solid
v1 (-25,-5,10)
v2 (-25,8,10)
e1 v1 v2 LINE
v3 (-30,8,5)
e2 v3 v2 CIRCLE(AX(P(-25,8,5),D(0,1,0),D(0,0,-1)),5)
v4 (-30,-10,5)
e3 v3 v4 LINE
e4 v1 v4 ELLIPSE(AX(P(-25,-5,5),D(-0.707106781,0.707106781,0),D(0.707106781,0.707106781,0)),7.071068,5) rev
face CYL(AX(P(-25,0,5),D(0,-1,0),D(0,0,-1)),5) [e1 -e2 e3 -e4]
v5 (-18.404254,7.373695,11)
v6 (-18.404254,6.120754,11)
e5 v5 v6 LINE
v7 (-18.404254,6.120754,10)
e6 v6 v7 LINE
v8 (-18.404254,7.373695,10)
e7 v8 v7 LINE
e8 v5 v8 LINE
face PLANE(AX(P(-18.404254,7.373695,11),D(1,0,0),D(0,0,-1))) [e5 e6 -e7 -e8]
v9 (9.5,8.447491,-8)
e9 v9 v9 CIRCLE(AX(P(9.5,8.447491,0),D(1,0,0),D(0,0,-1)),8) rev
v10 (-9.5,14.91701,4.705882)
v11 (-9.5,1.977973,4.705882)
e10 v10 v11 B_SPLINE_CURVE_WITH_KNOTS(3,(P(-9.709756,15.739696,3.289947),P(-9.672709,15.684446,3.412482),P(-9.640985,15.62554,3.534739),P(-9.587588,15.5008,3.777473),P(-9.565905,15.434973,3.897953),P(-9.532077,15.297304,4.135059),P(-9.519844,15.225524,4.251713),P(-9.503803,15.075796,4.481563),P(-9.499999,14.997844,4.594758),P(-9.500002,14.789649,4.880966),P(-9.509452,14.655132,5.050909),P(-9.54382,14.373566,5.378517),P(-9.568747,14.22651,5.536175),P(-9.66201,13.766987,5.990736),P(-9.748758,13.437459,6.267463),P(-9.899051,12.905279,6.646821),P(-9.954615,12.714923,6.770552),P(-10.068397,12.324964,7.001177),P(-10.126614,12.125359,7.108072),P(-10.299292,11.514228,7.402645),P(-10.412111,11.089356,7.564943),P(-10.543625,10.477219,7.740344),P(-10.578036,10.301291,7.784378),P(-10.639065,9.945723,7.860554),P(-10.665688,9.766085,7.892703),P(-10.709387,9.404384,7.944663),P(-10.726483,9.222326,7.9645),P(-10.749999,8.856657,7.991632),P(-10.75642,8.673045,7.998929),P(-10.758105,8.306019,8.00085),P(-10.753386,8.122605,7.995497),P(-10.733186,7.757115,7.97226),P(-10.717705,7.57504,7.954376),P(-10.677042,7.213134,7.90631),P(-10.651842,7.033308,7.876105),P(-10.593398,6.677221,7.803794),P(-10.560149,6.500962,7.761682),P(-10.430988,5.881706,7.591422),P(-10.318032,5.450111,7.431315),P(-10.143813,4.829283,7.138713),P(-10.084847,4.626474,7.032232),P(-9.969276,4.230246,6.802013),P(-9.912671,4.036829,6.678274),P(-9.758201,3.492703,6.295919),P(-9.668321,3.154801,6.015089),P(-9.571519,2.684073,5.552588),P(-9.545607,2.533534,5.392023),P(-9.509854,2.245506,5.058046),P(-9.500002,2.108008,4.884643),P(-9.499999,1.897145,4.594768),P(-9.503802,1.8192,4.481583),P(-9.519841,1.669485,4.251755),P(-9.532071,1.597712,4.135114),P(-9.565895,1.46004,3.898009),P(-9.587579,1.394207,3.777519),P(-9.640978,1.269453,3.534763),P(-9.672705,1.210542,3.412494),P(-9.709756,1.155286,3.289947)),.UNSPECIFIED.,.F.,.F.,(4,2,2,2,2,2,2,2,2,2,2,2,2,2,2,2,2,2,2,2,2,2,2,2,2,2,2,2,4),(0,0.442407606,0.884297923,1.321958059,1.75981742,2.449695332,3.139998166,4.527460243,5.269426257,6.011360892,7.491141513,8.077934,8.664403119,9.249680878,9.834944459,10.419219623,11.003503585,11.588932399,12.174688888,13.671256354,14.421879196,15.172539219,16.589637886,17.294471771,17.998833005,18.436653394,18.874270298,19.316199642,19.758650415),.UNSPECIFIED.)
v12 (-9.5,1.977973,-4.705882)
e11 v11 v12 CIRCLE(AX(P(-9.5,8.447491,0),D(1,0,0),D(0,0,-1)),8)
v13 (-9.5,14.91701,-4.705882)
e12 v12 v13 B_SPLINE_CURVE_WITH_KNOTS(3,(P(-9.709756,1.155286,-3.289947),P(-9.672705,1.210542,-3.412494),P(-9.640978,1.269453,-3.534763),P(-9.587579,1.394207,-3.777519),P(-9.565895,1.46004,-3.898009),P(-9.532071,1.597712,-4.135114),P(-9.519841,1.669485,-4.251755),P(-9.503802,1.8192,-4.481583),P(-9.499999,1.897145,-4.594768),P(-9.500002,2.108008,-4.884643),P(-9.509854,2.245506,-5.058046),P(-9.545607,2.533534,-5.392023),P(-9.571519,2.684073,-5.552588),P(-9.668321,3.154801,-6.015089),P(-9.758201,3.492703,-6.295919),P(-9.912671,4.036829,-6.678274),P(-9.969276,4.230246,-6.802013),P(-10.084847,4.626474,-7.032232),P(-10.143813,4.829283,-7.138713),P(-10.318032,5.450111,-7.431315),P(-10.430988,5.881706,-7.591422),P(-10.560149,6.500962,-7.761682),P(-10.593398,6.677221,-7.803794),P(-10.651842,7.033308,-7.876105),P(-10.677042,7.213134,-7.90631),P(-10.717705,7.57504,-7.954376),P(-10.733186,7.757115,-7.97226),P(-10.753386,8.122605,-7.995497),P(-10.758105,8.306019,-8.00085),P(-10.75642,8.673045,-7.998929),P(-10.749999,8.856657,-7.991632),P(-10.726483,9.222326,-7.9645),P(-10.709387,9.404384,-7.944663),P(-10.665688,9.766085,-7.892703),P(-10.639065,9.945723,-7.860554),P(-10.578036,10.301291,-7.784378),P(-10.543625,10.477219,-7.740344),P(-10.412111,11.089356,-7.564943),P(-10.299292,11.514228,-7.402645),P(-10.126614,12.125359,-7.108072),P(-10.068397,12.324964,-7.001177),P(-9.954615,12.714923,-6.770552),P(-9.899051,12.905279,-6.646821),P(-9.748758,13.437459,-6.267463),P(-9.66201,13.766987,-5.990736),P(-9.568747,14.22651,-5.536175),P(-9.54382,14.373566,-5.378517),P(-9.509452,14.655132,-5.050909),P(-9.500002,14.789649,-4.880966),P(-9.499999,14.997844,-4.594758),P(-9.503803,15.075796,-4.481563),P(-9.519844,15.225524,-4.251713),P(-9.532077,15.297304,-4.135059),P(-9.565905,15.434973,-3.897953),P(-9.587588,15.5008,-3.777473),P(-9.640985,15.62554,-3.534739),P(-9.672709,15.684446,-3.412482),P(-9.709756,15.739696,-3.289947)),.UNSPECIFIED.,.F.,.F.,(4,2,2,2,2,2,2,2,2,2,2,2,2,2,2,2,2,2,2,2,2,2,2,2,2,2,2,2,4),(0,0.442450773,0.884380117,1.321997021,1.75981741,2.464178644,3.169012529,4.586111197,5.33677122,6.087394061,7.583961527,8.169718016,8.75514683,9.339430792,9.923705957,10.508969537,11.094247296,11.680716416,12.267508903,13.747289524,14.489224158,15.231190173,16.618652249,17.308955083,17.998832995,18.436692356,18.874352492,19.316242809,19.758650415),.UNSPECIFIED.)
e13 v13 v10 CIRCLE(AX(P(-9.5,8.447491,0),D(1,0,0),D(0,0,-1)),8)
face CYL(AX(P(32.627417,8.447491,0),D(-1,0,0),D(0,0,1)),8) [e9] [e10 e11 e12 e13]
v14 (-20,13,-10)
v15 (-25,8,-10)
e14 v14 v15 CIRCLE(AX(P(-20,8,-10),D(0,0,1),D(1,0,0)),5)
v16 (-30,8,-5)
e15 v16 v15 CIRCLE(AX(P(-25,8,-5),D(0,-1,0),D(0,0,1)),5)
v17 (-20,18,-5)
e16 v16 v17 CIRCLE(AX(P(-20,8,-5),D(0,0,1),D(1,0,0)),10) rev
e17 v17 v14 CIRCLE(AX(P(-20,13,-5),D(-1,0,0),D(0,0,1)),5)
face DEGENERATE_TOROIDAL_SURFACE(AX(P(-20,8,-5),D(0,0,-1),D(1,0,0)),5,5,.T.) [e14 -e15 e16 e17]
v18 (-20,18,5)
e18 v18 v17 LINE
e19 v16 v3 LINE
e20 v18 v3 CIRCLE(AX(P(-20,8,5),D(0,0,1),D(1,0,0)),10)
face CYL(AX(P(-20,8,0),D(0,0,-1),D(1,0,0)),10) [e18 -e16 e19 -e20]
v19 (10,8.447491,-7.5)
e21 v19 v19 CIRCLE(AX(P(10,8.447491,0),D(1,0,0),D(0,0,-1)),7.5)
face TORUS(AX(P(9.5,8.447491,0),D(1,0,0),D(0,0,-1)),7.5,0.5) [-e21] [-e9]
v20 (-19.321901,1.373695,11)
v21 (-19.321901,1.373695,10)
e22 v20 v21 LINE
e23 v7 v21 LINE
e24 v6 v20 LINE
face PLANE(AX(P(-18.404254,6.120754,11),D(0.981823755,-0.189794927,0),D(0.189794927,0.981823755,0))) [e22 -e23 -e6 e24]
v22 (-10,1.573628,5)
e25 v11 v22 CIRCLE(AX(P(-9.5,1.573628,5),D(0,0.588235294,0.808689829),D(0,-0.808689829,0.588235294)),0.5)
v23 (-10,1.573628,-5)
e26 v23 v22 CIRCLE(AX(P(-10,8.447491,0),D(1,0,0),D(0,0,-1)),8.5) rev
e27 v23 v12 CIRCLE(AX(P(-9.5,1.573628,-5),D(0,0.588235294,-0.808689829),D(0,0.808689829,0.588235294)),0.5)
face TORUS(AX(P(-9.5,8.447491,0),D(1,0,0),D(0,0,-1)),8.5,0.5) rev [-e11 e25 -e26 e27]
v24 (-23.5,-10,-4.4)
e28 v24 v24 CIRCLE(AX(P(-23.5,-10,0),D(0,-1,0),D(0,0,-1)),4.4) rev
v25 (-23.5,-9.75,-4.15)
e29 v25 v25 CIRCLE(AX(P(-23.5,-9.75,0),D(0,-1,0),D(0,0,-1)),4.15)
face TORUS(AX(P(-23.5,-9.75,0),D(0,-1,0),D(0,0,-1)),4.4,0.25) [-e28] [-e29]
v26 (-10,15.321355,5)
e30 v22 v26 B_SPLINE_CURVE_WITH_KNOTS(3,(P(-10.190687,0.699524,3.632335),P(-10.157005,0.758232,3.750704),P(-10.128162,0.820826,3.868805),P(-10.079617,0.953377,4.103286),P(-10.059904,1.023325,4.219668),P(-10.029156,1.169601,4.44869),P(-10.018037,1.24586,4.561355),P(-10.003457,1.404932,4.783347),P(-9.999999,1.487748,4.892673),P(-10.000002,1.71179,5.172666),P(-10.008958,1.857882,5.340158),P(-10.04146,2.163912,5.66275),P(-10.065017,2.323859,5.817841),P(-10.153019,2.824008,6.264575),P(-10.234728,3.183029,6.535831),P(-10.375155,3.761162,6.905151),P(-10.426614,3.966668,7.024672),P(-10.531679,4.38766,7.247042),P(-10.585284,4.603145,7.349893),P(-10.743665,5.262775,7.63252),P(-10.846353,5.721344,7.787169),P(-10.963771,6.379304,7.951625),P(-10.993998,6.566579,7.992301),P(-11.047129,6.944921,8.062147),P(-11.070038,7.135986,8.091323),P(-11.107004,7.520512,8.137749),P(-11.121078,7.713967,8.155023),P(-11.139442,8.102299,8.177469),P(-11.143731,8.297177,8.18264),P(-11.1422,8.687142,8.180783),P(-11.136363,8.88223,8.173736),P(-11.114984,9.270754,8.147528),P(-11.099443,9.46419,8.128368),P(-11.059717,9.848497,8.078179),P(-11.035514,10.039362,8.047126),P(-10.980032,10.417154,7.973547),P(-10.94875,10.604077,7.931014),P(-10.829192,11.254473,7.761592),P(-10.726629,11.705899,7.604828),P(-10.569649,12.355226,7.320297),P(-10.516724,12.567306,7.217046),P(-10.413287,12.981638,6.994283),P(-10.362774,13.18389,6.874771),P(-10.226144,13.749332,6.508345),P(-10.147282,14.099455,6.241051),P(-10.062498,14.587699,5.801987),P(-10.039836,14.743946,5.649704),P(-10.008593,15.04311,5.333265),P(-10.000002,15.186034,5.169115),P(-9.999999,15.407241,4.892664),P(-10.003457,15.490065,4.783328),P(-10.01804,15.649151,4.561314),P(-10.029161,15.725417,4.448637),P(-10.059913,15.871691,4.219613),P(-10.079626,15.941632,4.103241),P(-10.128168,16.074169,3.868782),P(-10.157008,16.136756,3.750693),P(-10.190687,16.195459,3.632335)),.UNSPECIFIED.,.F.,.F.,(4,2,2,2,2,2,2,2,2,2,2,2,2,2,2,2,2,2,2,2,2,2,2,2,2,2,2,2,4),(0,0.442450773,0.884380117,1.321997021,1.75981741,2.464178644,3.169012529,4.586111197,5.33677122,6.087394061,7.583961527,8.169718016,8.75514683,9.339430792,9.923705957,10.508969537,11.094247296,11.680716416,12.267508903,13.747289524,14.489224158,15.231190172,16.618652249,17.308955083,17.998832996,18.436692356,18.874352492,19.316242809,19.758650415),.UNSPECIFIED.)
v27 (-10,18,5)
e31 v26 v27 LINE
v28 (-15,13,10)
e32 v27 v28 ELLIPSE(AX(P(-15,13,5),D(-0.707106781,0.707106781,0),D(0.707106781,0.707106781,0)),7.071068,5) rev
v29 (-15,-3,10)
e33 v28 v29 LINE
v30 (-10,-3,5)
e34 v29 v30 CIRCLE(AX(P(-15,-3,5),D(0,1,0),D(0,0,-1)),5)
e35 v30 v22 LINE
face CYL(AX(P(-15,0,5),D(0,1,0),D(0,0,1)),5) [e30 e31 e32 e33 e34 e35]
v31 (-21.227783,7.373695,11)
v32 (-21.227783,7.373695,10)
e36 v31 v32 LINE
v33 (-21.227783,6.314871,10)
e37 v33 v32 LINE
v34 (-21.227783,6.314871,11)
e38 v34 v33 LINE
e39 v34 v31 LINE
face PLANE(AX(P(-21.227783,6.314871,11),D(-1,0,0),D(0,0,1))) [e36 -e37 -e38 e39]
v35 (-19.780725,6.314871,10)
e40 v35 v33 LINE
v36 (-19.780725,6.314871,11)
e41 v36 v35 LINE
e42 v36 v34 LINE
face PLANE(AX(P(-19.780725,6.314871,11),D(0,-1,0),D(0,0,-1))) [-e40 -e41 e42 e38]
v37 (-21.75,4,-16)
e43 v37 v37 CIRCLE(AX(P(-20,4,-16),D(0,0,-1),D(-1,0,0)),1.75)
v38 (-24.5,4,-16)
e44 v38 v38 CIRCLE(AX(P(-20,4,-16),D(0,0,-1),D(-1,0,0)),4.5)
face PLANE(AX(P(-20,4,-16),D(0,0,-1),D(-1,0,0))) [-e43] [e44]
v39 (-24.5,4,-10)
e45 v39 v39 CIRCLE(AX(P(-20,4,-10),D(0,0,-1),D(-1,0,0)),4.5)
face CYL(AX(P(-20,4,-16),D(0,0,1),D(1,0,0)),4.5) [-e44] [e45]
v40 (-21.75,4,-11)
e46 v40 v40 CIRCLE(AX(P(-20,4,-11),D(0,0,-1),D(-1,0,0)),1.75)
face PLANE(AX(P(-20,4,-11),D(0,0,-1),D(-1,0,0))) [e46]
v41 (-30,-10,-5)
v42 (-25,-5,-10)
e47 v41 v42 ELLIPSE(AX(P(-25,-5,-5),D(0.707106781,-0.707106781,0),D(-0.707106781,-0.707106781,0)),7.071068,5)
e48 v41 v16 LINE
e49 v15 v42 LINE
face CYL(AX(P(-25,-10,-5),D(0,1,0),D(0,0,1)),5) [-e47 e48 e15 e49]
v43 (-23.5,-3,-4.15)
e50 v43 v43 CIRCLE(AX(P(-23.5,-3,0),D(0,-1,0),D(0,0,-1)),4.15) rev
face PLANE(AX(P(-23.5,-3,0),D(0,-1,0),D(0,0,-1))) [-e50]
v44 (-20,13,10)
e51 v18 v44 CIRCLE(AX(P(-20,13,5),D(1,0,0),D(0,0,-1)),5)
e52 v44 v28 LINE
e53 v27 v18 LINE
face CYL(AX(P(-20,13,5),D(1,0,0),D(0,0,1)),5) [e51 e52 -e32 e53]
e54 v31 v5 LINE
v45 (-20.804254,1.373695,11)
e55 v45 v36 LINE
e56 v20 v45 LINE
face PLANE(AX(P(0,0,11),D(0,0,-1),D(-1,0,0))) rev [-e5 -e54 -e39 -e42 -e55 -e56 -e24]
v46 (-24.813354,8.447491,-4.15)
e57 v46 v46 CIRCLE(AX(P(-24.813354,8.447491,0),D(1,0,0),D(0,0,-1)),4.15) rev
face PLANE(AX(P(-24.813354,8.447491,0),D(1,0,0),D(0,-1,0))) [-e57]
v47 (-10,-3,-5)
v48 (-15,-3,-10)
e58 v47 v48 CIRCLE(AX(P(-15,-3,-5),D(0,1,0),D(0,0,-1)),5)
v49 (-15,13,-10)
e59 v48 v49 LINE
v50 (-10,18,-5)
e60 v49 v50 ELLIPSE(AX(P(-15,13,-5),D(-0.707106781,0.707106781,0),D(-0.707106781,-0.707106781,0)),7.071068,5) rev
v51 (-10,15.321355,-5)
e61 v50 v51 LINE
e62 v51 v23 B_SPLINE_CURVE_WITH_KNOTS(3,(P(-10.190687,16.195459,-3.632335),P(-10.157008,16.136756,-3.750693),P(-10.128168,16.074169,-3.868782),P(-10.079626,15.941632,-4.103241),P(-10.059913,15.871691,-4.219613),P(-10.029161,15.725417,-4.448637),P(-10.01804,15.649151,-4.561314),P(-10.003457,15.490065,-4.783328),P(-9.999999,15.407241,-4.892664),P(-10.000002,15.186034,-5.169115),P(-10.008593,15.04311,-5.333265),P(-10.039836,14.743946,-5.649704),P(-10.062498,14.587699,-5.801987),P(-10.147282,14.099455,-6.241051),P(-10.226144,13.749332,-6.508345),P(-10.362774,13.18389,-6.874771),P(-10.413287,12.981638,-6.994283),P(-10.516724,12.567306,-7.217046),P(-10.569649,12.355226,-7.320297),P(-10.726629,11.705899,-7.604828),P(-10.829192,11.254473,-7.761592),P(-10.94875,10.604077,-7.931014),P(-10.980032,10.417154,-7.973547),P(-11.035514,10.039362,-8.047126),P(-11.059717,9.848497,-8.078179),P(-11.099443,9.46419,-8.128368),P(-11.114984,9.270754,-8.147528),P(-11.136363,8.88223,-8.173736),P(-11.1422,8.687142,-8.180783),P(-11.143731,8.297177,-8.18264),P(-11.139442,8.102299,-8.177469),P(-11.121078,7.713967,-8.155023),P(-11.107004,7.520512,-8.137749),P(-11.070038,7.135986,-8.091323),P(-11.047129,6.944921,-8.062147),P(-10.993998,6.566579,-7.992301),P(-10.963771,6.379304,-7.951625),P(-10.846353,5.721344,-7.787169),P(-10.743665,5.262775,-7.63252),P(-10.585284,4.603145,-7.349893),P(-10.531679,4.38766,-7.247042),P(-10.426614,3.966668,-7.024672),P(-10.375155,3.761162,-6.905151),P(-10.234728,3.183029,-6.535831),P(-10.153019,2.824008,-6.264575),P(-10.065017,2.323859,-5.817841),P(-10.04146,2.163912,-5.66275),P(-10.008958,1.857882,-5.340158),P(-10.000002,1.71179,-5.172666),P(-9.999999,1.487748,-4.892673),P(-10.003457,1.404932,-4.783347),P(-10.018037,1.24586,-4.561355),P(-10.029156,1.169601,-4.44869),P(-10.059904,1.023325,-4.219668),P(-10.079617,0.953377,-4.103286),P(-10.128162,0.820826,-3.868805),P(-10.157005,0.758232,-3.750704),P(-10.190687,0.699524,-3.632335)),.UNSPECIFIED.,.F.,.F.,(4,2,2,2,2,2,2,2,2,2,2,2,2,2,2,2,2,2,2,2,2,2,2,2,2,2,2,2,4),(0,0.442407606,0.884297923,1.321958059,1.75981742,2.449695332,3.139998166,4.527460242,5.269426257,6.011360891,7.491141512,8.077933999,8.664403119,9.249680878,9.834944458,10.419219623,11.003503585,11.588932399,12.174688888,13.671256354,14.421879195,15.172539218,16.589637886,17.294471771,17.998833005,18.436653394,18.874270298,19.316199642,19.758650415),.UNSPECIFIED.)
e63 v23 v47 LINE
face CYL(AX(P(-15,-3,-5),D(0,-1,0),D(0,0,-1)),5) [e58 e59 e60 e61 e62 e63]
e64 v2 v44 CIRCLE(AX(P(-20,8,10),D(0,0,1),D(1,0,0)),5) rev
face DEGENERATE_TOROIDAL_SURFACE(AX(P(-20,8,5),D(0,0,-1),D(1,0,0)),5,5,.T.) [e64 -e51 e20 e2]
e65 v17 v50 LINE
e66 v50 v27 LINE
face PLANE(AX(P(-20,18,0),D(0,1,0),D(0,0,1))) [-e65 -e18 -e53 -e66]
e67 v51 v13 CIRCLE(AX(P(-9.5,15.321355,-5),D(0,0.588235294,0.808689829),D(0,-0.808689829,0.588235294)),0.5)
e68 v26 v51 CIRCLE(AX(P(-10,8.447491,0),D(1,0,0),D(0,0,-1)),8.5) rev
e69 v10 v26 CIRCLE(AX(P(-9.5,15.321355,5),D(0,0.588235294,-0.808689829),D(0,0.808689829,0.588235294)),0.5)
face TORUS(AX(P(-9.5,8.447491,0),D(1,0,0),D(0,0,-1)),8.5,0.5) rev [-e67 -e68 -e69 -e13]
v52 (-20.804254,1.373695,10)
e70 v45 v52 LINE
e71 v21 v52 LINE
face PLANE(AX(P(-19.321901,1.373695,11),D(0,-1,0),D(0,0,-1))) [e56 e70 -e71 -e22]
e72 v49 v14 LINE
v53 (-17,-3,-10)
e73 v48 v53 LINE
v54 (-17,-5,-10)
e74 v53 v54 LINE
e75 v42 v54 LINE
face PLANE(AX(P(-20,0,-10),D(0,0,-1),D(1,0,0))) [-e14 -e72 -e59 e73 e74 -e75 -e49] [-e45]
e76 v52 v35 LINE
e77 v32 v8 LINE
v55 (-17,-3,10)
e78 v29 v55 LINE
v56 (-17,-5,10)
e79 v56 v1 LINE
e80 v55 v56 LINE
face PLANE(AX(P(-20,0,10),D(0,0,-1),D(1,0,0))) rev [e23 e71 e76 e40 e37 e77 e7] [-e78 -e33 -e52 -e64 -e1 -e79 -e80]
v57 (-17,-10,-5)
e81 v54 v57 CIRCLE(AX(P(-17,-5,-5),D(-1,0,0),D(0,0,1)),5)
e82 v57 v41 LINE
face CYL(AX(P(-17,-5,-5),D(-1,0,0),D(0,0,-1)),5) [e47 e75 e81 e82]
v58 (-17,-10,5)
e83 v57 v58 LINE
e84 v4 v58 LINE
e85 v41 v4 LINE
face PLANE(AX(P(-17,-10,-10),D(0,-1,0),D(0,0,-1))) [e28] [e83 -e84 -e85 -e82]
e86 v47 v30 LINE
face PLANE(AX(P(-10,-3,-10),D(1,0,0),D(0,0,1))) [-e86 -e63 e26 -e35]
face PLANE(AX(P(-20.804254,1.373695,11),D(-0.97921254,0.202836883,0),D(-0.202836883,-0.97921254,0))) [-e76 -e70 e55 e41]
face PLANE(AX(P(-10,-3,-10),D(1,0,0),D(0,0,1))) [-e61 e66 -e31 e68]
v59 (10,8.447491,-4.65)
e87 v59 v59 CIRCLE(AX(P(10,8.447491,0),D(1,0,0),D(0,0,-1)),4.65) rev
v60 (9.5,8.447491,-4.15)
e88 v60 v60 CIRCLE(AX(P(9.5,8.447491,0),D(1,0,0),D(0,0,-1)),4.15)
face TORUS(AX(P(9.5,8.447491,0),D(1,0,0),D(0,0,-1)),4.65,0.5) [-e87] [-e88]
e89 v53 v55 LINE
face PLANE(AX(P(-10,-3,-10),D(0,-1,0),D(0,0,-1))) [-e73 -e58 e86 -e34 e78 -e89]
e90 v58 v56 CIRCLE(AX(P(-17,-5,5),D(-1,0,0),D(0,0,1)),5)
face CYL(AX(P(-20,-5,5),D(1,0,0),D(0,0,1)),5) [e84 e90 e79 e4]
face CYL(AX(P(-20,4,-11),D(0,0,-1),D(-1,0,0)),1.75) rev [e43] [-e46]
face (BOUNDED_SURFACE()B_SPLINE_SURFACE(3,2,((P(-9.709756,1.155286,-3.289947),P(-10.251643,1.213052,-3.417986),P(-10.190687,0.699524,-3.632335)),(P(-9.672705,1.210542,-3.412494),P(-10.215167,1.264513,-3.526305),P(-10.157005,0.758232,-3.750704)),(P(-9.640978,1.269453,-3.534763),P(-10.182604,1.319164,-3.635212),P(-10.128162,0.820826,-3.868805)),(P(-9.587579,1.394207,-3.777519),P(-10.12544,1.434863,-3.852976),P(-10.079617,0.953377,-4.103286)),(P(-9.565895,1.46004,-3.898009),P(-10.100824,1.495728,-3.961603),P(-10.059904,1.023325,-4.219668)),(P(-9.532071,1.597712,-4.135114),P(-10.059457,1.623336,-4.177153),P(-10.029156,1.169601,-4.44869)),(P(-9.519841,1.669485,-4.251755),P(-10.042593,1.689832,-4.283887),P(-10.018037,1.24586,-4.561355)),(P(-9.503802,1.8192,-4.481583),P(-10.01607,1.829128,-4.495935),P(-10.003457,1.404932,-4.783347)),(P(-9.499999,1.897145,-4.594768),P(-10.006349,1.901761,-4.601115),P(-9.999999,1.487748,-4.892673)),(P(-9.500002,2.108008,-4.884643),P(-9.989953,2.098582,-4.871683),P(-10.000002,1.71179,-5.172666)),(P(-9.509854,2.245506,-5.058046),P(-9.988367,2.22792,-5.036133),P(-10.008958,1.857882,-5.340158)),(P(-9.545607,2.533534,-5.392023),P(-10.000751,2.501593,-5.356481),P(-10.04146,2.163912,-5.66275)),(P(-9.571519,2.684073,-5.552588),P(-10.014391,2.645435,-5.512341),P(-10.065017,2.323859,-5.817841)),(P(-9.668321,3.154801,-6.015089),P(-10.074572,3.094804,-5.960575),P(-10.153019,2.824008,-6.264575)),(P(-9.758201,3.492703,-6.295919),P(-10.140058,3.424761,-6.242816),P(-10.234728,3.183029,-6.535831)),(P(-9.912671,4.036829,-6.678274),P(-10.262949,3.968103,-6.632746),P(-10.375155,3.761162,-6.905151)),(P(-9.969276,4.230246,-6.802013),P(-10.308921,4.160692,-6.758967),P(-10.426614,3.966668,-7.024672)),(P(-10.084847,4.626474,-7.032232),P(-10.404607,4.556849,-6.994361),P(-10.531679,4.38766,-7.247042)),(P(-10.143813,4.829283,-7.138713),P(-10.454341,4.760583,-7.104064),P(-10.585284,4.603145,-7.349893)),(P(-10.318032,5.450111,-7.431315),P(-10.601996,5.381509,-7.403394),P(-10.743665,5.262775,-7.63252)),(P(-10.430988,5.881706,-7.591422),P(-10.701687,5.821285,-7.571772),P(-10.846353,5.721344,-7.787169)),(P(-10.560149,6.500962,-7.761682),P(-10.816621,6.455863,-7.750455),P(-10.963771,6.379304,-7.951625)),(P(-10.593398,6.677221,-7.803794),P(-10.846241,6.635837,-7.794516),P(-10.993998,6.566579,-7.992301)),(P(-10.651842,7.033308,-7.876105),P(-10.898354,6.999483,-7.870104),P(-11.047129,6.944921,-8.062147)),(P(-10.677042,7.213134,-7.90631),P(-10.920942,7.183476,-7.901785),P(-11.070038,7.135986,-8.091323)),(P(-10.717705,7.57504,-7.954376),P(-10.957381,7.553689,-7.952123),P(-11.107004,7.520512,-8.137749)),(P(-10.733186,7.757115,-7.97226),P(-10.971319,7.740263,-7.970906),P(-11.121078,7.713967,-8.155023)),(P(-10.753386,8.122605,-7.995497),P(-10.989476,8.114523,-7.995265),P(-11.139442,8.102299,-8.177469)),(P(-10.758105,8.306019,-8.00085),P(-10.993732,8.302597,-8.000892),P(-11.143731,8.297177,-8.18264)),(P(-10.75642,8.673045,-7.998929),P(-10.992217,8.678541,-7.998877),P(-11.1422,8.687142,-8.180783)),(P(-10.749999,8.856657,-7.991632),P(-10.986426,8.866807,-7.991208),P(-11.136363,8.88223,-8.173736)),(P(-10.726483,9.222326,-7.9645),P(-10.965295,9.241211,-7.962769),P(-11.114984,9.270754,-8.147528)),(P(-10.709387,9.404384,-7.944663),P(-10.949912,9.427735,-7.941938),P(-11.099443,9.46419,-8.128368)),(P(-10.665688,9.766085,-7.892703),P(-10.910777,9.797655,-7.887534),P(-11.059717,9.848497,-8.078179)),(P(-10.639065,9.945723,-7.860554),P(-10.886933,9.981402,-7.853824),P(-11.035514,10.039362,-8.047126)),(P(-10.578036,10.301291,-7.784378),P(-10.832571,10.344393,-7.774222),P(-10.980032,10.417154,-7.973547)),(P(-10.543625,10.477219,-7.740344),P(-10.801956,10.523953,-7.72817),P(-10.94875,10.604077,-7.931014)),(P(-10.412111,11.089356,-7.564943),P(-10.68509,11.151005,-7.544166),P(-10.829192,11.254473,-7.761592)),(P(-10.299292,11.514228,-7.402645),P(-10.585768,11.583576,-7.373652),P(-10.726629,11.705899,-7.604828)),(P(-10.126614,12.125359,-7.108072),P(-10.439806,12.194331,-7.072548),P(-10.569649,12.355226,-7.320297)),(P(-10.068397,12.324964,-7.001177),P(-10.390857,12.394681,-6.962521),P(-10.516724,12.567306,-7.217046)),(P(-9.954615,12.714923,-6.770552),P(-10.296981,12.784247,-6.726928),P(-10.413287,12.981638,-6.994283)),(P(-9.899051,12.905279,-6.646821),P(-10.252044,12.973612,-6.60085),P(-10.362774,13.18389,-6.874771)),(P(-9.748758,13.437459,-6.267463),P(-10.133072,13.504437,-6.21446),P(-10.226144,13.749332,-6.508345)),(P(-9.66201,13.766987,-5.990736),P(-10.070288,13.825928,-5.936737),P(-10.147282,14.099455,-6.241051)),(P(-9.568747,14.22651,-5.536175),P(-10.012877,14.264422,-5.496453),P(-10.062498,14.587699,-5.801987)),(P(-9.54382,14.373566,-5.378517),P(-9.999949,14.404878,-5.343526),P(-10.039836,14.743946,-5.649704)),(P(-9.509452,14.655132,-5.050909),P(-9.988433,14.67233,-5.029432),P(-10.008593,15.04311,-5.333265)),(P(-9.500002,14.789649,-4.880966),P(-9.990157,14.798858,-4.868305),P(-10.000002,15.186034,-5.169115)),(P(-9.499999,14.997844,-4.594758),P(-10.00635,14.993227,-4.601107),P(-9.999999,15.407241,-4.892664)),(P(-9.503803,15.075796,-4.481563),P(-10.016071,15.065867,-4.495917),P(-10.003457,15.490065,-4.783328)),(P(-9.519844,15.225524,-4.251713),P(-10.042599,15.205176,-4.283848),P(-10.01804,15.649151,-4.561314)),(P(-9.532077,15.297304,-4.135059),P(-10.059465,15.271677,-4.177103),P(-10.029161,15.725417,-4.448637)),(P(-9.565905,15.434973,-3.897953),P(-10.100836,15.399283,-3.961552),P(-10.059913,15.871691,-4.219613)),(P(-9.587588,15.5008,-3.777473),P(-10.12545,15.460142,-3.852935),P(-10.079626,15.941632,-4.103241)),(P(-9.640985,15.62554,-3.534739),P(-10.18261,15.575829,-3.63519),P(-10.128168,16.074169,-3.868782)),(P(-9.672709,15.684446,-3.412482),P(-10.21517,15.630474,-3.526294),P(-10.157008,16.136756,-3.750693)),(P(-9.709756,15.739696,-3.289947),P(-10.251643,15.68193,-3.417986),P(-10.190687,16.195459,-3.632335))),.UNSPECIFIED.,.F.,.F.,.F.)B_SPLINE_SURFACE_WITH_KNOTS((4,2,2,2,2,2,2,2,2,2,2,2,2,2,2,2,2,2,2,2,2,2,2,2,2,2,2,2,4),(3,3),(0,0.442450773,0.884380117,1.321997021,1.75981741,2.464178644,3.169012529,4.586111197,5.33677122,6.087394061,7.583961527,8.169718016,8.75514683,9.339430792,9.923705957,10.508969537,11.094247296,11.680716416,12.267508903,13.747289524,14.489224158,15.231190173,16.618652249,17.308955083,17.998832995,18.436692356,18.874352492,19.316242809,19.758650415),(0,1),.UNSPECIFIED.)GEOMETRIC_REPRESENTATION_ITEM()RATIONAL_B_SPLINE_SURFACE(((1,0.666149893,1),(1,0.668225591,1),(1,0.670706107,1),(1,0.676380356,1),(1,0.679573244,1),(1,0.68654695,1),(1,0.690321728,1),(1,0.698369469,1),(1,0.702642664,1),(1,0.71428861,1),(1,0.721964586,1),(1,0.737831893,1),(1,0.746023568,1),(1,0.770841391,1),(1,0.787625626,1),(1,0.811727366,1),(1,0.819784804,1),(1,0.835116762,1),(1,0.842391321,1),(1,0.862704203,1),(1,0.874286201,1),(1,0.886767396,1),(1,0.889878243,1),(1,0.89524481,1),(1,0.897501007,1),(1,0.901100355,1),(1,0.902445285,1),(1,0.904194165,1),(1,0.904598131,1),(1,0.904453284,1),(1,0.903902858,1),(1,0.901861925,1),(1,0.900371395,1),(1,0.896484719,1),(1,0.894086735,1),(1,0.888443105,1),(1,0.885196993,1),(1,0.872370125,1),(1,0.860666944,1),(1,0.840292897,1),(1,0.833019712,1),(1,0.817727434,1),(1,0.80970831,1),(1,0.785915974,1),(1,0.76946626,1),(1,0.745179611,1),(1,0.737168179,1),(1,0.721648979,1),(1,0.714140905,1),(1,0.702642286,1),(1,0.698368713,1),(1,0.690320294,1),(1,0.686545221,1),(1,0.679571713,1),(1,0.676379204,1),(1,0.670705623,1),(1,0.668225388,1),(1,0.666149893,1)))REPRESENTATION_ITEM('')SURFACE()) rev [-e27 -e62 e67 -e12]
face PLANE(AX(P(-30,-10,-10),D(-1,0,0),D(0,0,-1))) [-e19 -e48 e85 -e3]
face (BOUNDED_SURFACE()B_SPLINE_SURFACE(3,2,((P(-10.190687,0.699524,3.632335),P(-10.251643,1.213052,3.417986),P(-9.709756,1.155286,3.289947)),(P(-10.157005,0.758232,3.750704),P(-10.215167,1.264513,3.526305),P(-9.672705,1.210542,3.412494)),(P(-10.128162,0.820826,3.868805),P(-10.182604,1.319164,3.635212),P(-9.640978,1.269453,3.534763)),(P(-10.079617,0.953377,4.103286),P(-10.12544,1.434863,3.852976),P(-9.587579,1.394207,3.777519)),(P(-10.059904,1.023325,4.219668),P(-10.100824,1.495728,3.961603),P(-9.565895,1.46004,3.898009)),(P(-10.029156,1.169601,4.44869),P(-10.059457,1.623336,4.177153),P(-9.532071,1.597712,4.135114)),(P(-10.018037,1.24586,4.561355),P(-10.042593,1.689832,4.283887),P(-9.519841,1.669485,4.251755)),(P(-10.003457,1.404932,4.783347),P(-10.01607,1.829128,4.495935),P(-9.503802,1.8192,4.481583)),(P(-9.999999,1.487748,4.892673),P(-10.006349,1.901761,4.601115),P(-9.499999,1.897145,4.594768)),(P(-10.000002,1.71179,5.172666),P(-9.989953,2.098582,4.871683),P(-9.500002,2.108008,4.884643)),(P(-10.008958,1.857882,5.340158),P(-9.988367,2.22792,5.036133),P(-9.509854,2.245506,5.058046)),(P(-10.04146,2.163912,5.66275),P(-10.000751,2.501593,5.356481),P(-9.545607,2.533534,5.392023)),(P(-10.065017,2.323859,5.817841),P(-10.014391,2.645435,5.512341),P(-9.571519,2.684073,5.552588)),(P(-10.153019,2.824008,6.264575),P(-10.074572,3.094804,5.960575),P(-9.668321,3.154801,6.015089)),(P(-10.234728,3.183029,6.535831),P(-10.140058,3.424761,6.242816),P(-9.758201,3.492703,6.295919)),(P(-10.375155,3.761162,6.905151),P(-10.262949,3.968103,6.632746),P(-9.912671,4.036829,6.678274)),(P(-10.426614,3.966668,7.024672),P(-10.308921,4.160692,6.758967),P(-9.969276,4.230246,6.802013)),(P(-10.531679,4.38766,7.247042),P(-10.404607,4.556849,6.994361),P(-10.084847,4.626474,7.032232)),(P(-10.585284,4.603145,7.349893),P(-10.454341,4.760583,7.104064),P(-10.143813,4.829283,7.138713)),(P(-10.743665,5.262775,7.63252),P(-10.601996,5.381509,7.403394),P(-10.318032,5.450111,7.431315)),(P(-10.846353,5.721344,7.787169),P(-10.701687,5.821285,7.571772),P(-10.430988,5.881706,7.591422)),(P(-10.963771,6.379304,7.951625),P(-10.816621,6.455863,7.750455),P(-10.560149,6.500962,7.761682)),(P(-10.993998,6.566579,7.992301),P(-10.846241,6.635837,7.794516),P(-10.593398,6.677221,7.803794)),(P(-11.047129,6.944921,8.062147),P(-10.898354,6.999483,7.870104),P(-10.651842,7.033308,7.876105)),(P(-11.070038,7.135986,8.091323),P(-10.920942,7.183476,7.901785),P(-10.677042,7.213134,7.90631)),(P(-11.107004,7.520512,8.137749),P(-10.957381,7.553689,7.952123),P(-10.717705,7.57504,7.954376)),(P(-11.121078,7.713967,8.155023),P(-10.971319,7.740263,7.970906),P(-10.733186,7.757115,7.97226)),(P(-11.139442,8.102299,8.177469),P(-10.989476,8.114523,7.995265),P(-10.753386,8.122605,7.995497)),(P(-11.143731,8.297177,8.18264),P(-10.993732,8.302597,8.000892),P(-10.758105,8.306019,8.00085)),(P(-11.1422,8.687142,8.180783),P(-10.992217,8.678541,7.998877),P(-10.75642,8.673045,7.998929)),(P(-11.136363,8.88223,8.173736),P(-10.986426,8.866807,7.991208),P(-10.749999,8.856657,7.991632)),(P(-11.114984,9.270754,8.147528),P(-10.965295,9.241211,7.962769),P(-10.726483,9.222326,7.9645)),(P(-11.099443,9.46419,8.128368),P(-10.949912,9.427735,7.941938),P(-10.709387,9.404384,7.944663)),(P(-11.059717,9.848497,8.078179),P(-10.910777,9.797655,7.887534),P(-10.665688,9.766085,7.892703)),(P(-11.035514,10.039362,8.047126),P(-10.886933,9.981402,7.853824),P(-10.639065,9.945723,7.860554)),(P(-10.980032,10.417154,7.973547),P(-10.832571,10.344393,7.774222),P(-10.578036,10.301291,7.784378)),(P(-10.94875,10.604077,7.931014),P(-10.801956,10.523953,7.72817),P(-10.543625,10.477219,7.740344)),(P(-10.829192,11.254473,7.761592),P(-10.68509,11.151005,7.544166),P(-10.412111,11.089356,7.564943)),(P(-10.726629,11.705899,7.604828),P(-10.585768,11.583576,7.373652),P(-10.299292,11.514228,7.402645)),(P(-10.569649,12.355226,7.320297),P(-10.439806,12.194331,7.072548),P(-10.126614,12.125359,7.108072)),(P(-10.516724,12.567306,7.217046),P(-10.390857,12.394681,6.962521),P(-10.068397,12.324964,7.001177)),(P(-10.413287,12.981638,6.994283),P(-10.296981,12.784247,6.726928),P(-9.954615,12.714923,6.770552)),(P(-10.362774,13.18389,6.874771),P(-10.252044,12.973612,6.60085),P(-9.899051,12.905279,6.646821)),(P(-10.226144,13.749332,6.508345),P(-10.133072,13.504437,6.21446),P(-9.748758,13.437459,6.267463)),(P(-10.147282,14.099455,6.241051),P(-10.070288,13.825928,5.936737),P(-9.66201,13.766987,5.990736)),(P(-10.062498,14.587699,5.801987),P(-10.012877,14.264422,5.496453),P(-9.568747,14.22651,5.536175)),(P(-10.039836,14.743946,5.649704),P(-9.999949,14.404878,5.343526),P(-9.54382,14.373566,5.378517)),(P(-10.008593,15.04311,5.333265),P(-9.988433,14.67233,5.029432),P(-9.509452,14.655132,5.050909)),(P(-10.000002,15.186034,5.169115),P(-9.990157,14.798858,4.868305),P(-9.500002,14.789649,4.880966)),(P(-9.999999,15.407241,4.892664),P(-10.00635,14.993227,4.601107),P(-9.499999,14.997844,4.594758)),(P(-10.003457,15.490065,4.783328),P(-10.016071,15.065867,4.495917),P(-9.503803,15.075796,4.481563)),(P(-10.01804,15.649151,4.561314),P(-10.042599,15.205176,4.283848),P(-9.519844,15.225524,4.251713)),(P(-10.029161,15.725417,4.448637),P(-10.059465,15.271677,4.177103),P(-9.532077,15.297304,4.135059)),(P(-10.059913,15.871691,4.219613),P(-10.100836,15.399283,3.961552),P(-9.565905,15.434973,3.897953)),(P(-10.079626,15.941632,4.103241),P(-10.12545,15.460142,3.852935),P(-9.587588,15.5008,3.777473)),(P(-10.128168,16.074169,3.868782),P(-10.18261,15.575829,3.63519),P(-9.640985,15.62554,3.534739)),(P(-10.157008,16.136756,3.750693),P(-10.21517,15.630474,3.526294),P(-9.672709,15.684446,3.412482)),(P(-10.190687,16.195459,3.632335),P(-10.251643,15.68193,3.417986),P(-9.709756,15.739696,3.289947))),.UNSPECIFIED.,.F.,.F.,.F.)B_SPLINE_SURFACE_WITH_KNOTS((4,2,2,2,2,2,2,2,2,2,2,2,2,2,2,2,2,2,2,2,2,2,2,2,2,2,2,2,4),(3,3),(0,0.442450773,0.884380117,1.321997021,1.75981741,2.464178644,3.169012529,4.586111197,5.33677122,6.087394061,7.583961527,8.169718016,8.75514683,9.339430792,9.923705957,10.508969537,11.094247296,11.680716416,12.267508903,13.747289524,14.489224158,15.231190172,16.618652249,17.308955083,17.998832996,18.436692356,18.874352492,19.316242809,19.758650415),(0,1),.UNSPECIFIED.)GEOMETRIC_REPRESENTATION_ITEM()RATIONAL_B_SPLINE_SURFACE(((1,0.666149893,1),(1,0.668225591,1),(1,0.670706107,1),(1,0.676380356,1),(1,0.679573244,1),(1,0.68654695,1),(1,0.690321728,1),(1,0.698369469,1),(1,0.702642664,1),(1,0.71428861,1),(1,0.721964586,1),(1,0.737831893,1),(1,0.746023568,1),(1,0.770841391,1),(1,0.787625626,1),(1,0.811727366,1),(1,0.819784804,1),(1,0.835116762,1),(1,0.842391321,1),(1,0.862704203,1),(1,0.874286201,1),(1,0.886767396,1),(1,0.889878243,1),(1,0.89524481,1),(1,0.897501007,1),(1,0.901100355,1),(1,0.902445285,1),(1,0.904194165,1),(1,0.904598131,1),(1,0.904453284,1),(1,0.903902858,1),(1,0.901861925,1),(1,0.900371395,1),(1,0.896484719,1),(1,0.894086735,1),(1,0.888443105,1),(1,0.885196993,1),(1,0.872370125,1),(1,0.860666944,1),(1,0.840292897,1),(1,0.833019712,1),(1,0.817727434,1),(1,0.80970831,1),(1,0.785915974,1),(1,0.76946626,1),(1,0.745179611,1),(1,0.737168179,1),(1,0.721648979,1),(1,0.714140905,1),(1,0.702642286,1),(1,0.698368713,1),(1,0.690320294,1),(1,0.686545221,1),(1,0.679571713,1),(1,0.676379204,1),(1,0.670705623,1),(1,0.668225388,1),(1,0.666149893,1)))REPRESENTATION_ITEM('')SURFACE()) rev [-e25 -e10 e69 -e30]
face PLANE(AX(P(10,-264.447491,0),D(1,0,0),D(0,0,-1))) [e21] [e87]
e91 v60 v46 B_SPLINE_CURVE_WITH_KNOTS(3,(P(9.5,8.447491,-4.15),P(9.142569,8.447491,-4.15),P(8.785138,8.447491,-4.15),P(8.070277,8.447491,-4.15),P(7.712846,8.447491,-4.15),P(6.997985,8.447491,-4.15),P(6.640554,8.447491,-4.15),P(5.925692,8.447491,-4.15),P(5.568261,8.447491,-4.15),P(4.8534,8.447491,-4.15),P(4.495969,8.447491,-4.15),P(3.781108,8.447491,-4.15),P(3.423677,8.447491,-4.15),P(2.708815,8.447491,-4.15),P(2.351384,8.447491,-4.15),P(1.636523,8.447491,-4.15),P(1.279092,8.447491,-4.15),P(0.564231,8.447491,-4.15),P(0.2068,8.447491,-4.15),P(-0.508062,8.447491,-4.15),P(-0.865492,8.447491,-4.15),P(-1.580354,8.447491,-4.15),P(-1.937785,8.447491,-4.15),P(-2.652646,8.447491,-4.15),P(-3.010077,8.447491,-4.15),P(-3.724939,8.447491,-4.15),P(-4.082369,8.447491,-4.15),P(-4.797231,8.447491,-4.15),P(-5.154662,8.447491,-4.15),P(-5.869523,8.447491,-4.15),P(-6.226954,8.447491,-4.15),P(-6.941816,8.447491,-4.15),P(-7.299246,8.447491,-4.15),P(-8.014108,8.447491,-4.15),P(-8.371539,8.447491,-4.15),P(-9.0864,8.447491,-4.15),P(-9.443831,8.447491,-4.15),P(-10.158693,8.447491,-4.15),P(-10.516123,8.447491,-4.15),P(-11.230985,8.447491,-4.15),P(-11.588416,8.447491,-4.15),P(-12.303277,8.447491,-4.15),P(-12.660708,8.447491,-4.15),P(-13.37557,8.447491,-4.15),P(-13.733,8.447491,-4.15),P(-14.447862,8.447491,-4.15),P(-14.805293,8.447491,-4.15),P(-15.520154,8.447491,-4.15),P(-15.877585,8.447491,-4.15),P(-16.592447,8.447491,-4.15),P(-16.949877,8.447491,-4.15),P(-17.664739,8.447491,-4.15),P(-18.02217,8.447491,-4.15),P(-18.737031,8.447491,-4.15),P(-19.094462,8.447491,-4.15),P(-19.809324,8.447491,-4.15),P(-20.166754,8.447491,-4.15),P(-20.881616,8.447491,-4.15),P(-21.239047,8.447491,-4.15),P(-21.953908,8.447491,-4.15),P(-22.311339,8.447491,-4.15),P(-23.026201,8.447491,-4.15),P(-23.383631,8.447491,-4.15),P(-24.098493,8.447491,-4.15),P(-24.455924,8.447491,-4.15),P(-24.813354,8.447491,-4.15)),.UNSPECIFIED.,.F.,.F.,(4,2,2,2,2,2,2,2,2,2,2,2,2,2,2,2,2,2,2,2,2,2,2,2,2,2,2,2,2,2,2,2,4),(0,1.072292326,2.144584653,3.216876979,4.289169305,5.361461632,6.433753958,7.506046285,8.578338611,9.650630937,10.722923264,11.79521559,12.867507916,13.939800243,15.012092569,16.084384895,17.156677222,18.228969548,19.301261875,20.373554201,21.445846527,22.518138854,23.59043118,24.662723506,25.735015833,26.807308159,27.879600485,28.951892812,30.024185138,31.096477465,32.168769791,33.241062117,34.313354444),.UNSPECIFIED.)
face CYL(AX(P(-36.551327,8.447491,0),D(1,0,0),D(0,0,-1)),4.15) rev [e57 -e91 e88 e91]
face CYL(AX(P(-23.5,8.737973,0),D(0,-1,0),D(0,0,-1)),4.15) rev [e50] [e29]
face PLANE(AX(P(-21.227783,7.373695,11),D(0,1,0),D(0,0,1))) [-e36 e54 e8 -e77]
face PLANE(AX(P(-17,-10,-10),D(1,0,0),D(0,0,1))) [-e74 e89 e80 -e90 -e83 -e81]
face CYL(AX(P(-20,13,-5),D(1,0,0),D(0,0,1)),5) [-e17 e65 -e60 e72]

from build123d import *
from build123d.topology import SkipClean

# Parameters (mm, degrees)
BOSS_EXTRU_1_DEPTH       = 10
BOSS_EXTRU_1_DEPTH_BACK  = 10
ESQUISSE2_R              = 4
ENL_V_MAT_EXTRU_1_DEPTH  = 7
ESQUISSE3_W              = 20
ESQUISSE3_H              = 20
BOSS_EXTRU_2_DEPTH       = 8
EMPREINTE1_START         = -10
EMPREINTE1_OUTLINE_R     = 4
EMPREINTE1_DEPTH         = 14.813354444
CONG_1_R                 = 10
CONG_2_R                 = 5
ESQUISSE4_R              = 4.5
BOSS_EXTRU_3_DEPTH       = 6
ESQUISSE5_R              = 1.75
ENL_V_MAT_EXTRU_2_DEPTH  = 5
CONG_3_R                 = 0.25
ESQUISSE6_R              = 4.15
ENL_V_MAT_EXTRU_3_DEPTH  = 14.813354444
ESQUISSE7_R              = 4.15
ENL_V_MAT_EXTRU_5_DEPTH  = 7
BOSS_EXTRU_4_OUTLINE_R   = 8
BOSS_EXTRU_4_OUTLINE_R_2 = 4.15
BOSS_EXTRU_4_DEPTH       = 20
BOSS_EXTRU_4_START       = -5
BOSS_EXTRU_4_2_DEPTH     = 5
CONG_4_R                 = 0.5
CONG_5_R                 = 0.5
ESQUISSE9_R              = 8
ESQUISSE9_R_2            = 4.15
BOSS_EXTRU_6_DEPTH       = 22
CONG_6_R                 = 0.5
CONG_7_R                 = 0.25
CONG_8_R                 = 0.5
BOSS_EXTRU_7_DEPTH       = 1


with BuildPart() as part:
    # Esquisse1 → Boss.-Extru.1 (new, two sides: drawn at the far end of the back side and taken through both)
    with BuildSketch(Plane.XY.offset(-BOSS_EXTRU_1_DEPTH_BACK)):
        Polygon((-3, -10), (10, -10), (10, 10), (-10, 10), (-10, -3), (-3, -3), align=None)
    extrude(amount=BOSS_EXTRU_1_DEPTH + BOSS_EXTRU_1_DEPTH_BACK)

    # Esquisse2 → Enlèv. mat.-Extru.1 (cut)
    with BuildSketch(Plane(origin=(0, -10, 0), x_dir=(-1, 0, 0), z_dir=(0, -1, 0))):
        with Locations(Location((-3.5, 0, 0), (0, 0, 90))):
            Circle(ESQUISSE2_R)
    extrude(amount=-ENL_V_MAT_EXTRU_1_DEPTH, mode=Mode.SUBTRACT)

    # Esquisse3 → Boss.-Extru.2 (add)
    with BuildSketch(Plane(origin=(0, 10, 0), x_dir=(1, 0, 0), z_dir=(0, 1, 0))):
        Rectangle(ESQUISSE3_W, ESQUISSE3_H)
    extrude(amount=BOSS_EXTRU_2_DEPTH)

    # Empreinte1: read off the stored shape, not the designer's step
    # Empreinte1 outline → Empreinte1 (cut)
    with BuildSketch(Plane.YZ.offset(EMPREINTE1_START)):
        with Locations((8.447491166, 0)):
            Circle(EMPREINTE1_OUTLINE_R)
    extrude(amount=EMPREINTE1_DEPTH, mode=Mode.SUBTRACT)

    # Congé1
    cong_1_edges = [part.edges().sort_by_distance(p)[0] for p in [
        (10, 18, 0),
    ]]
    fillet(cong_1_edges, radius=CONG_1_R)

    # Congé2
    cong_2_edges = [part.edges().sort_by_distance(p)[0] for p in [
        (-10, 7.5, -10),
        (10, -1, 10),
        (-10, 7.5, 10),
        (3.5, -10, 10),
        (3.5, -10, -10),
        (-5, 18, 10),
        (10, -1, -10),
        (-5, 18, -10),
        (7.071067812, 15.071067812, -10),
        (7.071067812, 15.071067812, 10),
    ]]
    fillet(cong_2_edges, radius=CONG_2_R)


with BuildPart() as body_2:
    # Symétrie1: mirrored copy
    add(part.part.mirror(Plane(origin=(-3, -10, -10), x_dir=(0, 0, 1), z_dir=(0, -1, 0))))


with BuildPart() as body_2_2:
    # Symétrie3: mirrored copy
    add(body_2.part.mirror(Plane(origin=(-10, -27.201842148, 0), x_dir=(0, 0, 1), z_dir=(-1, 0, 0))))


with BuildPart() as body_2_3:
    # Symétrie4: mirrored copy
    add(body_2_2.part.mirror(Plane(origin=(-17, -10, -10), x_dir=(0, 0, 1), z_dir=(0, 1, 0))))

    # Esquisse4 → Boss.-Extru.3 (add)
    with BuildSketch(Plane(origin=(0, 0, -10), x_dir=(-1, 0, 0), z_dir=(0, 0, -1))):
        with Locations((20, 4)):
            Circle(ESQUISSE4_R)
    extrude(amount=BOSS_EXTRU_3_DEPTH)

    # Esquisse5 → Enlèv. mat.-Extru.2 (cut)
    with BuildSketch(Plane(origin=(0, 0, -16), x_dir=(-1, 0, 0), z_dir=(0, 0, -1))):
        with Locations((20, 4)):
            Circle(ESQUISSE5_R)
    extrude(amount=-ENL_V_MAT_EXTRU_2_DEPTH, mode=Mode.SUBTRACT)

    # Congé3
    cong_3_edges = [body_2_3.edges().sort_by_distance(p)[0] for p in [
        (-23.5, -10, 4),
        (-10, 4.447491166, 0),
    ]]
    fillet(cong_3_edges, radius=CONG_3_R)

    # Esquisse6 → Enlèv. mat.-Extru.3 (cut)
    with BuildSketch(Plane(origin=(-10, 0, 0), x_dir=(0, 0, -1), z_dir=(1, 0, 0))):
        with Locations((0, 8.447491166)):
            Circle(ESQUISSE6_R)
    extrude(amount=-ENL_V_MAT_EXTRU_3_DEPTH, mode=Mode.SUBTRACT)

    # Esquisse7 → Enlèv. mat.-Extru.5 (cut)
    with BuildSketch(Plane.XZ.offset(10)):
        with Locations(Location((-23.5, 0, 0), (0, 0, 270))):
            Circle(ESQUISSE7_R)
    extrude(amount=-ENL_V_MAT_EXTRU_5_DEPTH, mode=Mode.SUBTRACT)

    # Boss.-Extru.4: read off the stored shape, not the designer's step
    # Boss.-Extru.4 outline → Boss.-Extru.4 (add)
    with BuildSketch(Plane(origin=(-10, 0, 0), x_dir=(0, 0, -1), z_dir=(1, 0, 0))):
        with Locations((0, 8.447491166)):
            Circle(BOSS_EXTRU_4_OUTLINE_R)
        with Locations((0, 8.447491166)):
            Circle(BOSS_EXTRU_4_OUTLINE_R_2, mode=Mode.SUBTRACT)
    extrude(amount=BOSS_EXTRU_4_DEPTH)

    # Boss.-Extru.4 2 outline → Boss.-Extru.4 2 (add)
    with BuildSketch(Plane(origin=(-10, 0, 0), x_dir=(0, 0, -1), z_dir=(1, 0, 0)).offset(BOSS_EXTRU_4_START)):
        with BuildLine():
            Line((-5, 2.202493167), (-5, 14.692489164))
            ThreePointArc((-5, 14.692489164), (-8, 8.447491166), (-5, 2.202493167))
        make_face()
    extrude(amount=BOSS_EXTRU_4_2_DEPTH)

    # Congé4
    cong_4_edges = [body_2_3.edges().sort_by_distance(p)[0] for p in [
        (10, 8.447491166, 8),
    ]]
    fillet(cong_4_edges, radius=CONG_4_R)

    # Congé5
    cong_5_edges = [body_2_3.edges().sort_by_distance(p)[0] for p in [
        (10, 8.447491166, 4.15),
    ]]
    fillet(cong_5_edges, radius=CONG_5_R)


with BuildPart() as boss_extru_6_tool:
    # Esquisse9 → Boss.-Extru.6 (new body)
    with SkipClean():  # the faces are left unmerged after this step: merging them gives an invalid solid
        with BuildSketch(Plane(origin=(10, 0, 0), x_dir=(0, 0, -1), z_dir=(1, 0, 0))):
            with Locations(Location((0, 8.447491166, 0), (0, 0, 231.317812547))):
                Circle(ESQUISSE9_R)
            with Locations((0, 8.447491166)):
                Circle(ESQUISSE9_R_2, mode=Mode.SUBTRACT)
        extrude(amount=-BOSS_EXTRU_6_DEPTH)


with BuildPart() as body_2_3_1:
    with SkipClean():  # the faces are left unmerged after this step: merging them gives an invalid solid
        add(body_2_3.part)


with BuildPart() as body_2_3_2:
    # Boss.-Extru.6: joined with boss_extru_6_tool
    with SkipClean():  # the faces are left unmerged after this step: merging them gives an invalid solid
        add(body_2_3_1.part.fuse(boss_extru_6_tool.part, tol=0.00001))

    # Congé6
    # the kernel refuses this fillet: 0.5 mm, written as the material it takes off along each edge
    with BuildSketch(Plane(origin=(10, 8.447491166, 0), x_dir=(0, 0, -1), z_dir=(0, -1, 0))) as cong_6_piece_1:
        with BuildLine():
            CenterArc((4.15 + CONG_6_R, -CONG_6_R), CONG_6_R, 90, 90)
            Line((4.15, -CONG_6_R), (4.15, 0))
            Line((4.15, 0), (4.15 + CONG_6_R, 0))
        make_face()
    revolve(axis=Axis((10, 8.447491166, 0), (1, 0, 0)), mode=Mode.SUBTRACT)
    with BuildSketch(Plane(origin=(10, 8.447491166, 0), x_dir=(0, -0.7806247498051386, 0.6249999999933319), z_dir=(0, 0.6249999999933319, 0.7806247498051386))) as cong_6_piece_2:
        with BuildLine():
            CenterArc((8 - CONG_6_R, -CONG_6_R), CONG_6_R, 360, 90)
            Line((8, -CONG_6_R), (8, 0))
            Line((8, 0), (8 - CONG_6_R, 0))
        make_face()
    revolve(axis=Axis((10, 8.447491166, 0), (1, 0, 0)), mode=Mode.SUBTRACT)

    # Congé7
    cong_7_edges = [body_2_3_2.edges().sort_by_distance(p)[0] for p in [
        (-23.5, -9.979128785, 4.15),
    ]]
    fillet(cong_7_edges, radius=CONG_7_R - 0.0001)  # a hair under: the kernel refuses the full size

    # Congé8
    cong_8_edges = [body_2_3_2.edges().sort_by_distance(p)[0] for p in [
        (-10, 16.447491166, 0),
        (-11, 8.447491166, -8),
        (-11, 8.447491165, 8),
    ]]
    fillet(cong_8_edges, radius=CONG_8_R)

    # Esquisse10 → Boss.-Extru.7 (add)
    with BuildSketch(Plane.XY.offset(10)):
        Polygon((-18.404253987, 7.373694741), (-18.404253987, 6.120753565), (-19.321901046, 1.373694741), (-20.804253987, 1.373694741), (-19.780724575, 6.314871212), (-21.227783399, 6.314871212), (-21.227783399, 7.373694741), align=None)
    extrude(amount=BOSS_EXTRU_7_DEPTH)


solid = body_2_3_2.part
